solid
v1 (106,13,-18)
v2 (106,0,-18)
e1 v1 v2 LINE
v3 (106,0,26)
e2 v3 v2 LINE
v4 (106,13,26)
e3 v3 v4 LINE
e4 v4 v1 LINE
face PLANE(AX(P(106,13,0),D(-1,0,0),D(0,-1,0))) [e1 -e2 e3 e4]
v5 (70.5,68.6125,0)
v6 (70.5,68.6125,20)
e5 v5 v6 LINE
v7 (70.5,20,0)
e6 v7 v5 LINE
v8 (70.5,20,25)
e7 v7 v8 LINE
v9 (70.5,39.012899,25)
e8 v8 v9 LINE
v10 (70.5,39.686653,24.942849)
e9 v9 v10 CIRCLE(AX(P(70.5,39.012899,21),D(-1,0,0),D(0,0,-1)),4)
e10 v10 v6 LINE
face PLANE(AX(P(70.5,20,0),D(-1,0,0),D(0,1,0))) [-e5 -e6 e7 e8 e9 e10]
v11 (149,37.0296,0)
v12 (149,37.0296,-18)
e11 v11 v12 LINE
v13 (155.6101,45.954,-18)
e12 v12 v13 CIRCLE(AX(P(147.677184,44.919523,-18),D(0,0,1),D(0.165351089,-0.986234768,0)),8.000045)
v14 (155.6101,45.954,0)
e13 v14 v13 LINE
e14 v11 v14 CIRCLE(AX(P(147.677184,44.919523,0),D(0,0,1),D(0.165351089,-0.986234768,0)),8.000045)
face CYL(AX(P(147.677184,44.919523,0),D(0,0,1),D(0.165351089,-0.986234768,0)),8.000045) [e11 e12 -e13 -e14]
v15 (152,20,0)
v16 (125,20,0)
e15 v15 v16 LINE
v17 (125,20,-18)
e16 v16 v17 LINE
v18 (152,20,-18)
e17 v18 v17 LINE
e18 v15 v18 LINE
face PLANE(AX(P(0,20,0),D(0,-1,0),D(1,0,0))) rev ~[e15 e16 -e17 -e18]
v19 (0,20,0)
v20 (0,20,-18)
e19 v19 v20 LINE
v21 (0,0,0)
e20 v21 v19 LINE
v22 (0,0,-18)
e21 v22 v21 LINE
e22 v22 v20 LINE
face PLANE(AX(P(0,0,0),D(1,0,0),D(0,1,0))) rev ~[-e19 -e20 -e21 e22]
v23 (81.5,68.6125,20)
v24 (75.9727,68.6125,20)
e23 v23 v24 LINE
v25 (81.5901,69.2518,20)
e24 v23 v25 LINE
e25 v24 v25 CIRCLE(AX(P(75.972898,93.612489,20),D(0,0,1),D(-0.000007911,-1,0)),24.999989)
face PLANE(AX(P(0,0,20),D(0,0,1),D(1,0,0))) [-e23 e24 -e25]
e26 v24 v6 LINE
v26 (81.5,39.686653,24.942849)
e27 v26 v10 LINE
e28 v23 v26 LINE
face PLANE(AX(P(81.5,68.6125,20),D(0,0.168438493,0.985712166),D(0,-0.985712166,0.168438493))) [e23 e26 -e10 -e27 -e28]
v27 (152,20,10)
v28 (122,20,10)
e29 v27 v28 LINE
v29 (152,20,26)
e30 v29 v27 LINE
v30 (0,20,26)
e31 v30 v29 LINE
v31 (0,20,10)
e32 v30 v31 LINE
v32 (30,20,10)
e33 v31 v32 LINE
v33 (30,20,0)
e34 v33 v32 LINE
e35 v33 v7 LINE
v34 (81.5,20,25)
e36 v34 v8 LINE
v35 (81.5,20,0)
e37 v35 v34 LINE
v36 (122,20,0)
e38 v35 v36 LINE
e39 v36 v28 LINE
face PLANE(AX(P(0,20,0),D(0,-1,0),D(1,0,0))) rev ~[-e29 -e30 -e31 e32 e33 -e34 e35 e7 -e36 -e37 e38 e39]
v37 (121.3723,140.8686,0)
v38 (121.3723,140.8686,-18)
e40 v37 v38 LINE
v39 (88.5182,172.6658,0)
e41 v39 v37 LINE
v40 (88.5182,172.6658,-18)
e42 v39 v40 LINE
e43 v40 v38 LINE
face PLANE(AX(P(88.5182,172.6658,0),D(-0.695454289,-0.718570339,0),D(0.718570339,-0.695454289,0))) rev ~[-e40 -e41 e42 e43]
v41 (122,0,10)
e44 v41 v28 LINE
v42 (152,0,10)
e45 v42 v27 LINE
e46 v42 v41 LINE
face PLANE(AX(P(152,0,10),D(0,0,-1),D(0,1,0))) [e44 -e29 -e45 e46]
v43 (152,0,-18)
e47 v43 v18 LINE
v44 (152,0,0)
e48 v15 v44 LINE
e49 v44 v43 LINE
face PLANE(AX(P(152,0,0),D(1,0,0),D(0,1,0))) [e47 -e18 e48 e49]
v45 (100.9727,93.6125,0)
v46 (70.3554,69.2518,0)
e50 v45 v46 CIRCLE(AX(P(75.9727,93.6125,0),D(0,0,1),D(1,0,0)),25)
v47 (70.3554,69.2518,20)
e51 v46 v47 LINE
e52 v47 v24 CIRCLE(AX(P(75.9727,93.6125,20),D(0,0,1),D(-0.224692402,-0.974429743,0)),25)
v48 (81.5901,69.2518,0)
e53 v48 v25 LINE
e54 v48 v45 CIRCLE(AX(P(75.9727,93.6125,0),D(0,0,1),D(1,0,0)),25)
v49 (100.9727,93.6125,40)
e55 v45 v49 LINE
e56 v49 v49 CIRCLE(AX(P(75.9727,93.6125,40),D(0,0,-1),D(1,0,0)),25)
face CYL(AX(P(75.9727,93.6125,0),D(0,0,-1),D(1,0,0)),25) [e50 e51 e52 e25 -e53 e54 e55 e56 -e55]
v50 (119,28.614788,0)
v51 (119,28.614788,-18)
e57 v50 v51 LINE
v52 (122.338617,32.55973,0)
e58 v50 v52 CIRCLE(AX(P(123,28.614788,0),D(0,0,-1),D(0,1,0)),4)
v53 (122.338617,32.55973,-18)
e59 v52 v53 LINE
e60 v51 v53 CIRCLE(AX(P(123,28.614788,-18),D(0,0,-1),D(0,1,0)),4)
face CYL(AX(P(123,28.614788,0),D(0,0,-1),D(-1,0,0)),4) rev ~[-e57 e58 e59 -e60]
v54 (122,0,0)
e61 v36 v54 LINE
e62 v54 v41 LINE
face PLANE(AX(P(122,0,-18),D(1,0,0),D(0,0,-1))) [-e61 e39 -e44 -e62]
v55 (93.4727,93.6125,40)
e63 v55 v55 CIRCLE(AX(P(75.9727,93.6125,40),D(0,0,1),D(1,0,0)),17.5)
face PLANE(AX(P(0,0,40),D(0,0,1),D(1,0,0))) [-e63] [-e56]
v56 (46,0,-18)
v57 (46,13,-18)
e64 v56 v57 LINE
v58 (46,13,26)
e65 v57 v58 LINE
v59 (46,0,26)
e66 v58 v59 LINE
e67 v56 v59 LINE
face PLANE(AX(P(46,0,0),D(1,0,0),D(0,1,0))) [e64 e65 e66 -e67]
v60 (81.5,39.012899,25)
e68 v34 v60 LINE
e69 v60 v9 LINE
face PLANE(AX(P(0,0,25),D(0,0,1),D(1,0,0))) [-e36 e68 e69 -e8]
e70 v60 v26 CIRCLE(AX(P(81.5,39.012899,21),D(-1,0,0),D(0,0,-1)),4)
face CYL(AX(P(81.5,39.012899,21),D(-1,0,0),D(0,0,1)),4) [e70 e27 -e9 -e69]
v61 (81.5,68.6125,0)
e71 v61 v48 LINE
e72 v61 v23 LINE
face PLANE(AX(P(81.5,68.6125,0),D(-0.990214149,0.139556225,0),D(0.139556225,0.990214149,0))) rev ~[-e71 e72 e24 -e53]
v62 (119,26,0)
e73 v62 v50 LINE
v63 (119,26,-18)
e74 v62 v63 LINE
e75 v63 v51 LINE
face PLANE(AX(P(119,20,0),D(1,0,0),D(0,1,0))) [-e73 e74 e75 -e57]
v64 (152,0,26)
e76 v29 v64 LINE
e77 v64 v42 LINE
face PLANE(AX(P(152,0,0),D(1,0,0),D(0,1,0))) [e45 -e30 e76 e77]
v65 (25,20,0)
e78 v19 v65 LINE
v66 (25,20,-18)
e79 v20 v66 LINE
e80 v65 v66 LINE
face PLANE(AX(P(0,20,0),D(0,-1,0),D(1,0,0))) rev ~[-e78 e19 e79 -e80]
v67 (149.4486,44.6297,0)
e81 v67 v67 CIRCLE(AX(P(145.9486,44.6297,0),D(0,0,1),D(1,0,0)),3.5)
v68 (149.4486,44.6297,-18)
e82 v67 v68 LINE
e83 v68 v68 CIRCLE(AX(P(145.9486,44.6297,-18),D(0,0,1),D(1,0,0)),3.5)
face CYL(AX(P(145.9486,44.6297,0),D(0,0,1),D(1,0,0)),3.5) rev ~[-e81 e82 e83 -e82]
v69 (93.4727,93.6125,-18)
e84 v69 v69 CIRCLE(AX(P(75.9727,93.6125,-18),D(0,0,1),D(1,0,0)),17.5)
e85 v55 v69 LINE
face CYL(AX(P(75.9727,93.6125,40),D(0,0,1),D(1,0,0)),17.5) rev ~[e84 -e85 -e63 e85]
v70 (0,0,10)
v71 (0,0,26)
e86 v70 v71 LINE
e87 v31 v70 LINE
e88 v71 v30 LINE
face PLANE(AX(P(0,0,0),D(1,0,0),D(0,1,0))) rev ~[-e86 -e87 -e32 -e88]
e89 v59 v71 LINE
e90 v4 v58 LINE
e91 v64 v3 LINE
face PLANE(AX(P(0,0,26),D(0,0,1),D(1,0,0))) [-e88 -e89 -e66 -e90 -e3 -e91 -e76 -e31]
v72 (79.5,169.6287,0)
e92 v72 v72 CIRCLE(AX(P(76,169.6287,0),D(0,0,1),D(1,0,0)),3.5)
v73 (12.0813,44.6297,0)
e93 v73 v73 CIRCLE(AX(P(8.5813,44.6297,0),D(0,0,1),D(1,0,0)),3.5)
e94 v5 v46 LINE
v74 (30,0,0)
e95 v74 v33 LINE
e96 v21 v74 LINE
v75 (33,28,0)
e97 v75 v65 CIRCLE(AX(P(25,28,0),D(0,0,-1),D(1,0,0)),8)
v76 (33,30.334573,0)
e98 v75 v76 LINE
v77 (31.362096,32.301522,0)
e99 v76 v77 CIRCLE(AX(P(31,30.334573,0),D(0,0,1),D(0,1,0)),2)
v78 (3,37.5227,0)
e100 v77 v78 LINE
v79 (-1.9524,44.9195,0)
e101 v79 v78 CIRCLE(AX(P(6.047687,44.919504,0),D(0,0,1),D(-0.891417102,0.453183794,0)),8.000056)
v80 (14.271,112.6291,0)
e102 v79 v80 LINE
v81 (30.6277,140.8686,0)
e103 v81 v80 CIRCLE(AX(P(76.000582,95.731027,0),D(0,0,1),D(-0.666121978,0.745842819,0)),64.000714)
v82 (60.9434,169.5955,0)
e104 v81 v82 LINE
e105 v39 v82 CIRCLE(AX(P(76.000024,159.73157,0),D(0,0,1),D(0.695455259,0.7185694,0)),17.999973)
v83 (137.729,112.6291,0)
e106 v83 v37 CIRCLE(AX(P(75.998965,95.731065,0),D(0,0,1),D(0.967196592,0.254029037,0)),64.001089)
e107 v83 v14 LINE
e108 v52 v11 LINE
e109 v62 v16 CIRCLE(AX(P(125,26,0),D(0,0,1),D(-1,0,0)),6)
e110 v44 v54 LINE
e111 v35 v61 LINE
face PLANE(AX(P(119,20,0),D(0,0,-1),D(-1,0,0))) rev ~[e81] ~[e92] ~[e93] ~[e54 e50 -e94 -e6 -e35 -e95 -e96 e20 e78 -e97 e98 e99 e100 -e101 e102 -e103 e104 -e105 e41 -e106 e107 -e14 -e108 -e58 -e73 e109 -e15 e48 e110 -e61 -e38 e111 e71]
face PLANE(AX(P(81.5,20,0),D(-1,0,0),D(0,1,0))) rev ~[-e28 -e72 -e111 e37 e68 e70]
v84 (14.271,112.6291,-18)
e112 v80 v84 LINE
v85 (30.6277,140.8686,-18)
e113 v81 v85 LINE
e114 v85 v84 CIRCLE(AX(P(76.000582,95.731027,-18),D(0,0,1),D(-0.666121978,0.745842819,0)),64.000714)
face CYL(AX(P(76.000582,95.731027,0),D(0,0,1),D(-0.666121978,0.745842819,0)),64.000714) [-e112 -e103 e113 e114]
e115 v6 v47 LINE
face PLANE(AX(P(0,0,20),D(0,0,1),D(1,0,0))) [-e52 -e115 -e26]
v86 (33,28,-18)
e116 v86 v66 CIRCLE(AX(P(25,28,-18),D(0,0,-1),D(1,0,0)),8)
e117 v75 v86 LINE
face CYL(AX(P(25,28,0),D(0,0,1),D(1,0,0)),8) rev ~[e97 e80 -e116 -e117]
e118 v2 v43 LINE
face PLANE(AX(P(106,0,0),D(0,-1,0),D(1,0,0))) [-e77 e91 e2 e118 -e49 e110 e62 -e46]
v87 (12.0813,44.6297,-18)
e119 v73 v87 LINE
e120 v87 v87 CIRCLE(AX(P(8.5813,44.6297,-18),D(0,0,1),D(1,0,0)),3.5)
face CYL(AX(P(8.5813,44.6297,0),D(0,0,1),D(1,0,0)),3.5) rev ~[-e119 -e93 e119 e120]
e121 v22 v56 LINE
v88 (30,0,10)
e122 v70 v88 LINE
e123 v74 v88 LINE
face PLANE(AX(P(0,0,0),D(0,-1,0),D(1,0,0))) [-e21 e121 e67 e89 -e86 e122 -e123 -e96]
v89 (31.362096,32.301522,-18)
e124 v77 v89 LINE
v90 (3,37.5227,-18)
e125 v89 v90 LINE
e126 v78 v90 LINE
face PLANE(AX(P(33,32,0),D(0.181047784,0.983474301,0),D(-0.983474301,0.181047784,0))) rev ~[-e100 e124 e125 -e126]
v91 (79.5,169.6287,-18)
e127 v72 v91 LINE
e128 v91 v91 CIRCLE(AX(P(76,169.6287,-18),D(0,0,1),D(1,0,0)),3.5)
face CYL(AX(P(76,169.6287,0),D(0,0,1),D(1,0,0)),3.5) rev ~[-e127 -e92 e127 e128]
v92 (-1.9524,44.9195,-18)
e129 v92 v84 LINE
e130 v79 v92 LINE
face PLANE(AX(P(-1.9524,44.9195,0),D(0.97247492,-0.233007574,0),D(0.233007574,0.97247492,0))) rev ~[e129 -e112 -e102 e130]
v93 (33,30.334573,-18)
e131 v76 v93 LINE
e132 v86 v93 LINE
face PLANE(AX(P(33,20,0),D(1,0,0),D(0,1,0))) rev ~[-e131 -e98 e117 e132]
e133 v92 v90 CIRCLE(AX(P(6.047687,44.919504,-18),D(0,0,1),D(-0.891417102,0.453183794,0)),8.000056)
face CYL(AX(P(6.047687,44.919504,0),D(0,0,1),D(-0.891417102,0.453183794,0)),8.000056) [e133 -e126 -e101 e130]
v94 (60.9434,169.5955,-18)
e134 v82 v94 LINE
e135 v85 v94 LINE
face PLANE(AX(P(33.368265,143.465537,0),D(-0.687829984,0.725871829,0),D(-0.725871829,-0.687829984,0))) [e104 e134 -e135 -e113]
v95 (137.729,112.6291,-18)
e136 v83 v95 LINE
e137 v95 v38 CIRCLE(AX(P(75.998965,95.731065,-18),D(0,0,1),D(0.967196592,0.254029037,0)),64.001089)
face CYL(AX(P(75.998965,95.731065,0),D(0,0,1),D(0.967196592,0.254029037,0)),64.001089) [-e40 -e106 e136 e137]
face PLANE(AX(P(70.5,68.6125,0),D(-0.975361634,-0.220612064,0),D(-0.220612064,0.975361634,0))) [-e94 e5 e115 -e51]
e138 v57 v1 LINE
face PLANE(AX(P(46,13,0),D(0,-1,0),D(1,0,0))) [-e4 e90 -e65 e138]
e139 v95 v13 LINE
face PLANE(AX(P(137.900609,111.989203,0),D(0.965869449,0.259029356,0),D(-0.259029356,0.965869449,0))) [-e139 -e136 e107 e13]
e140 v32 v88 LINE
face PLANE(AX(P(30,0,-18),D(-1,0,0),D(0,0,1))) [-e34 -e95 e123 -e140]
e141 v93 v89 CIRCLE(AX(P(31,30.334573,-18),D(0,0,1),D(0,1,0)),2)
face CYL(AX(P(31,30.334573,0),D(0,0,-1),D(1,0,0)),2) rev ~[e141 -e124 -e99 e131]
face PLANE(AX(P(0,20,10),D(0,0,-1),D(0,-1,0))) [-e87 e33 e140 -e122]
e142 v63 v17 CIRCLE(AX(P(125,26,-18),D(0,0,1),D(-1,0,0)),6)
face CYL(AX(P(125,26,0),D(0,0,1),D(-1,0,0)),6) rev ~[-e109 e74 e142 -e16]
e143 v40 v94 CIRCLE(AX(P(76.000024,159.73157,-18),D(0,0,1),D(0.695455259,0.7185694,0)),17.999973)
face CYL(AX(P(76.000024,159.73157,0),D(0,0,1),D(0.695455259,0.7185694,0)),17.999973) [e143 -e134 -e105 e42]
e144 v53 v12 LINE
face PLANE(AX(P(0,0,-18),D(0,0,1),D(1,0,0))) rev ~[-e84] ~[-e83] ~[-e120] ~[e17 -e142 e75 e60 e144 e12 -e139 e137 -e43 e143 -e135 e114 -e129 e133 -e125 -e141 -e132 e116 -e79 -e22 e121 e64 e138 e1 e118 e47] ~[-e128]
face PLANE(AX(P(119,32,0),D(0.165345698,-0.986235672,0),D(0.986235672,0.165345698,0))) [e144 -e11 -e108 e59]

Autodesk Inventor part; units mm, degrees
ref_plane "YZ Plane" through (0, 0, 0) normal (1, 0, 0) x (0, 1, 0)
ref_plane "XZ Plane" through (0, 0, 0) normal (0, 1, 0) x (-1, 0, 0)
ref_plane "XY Plane" through (0, 0, 0) normal (0, 0, 1) x (1, 0, 0)
sketch "Sketch1" plane through (0, 0, 0) normal (0, 0, 1) x (1, 0, 0)
  line L0 (0, 0) -> (46, 0)
  line L1 (46, 0) -> (46, 13)
  line L2 (46, 13) -> (106, 13)
  line L3 (106, 13) -> (106, 0)
  line L4 (106, 0) -> (152, 0)
  line L5 (152, 0) -> (152, 20)
  line L6 (152, 20) -> (119, 20)
  line L7 (119, 20) -> (119, 32)
  line L8 (0, 0) -> (0, 20)
  line L9 (0, 20) -> (33, 20)
  line L10 (33, 20) -> (33, 32)
  arc A0 (88.5182, 172.6658) -> (60.9434, 169.5955) centre (76, 159.7315) ccw
  line L11 (88.5182, 172.6658) -> (121.3723, 140.8686)
  arc A1 (-1.0837, 48.545) -> (6.2613, 36.9223) centre (6.0476, 44.9195) ccw
  arc A2 (149, 37.0296) -> (155.0632, 47.9932) centre (147.6772, 44.9195) ccw
  line L12 (60.9434, 169.5955) -> (30.6277, 140.8686)
  line L13 (33, 32) -> (3, 37.5227)
  line L14 (119, 32) -> (149, 37.0296)
  line L15 (155.6101, 45.954) -> (137.729, 112.6291)
  line L16 (-1.9524, 44.9195) -> (14.271, 112.6291)
  arc A3 (137.9006, 111.9892) -> (119.6299, 142.555) centre (76, 95.7315) ccw
  arc A4 (33.3683, 143.4655) -> (13.316, 108.6436) centre (76, 95.7315) ccw
  point P0 (76, 13)
  dimension "d5" = 46
  dimension "d6" = 13
  dimension "d7" = 60
  dimension "d8" = 46
  dimension "d9" = 20
  dimension "d10" = 33
  dimension "d11" = 12
  dimension "d12" = 33
  dimension "d13" = 12
  dimension "d15" = 36
  dimension "d22" = 16
  dimension "d23" = 16
  dimension "d24" = 30
  dimension "d25" = 30
  dimension "d42" = 86
extrude "Extrusion1" add sketch "Sketch1" against normal blind 18 contours L8 L9 L10 L13 A1 L16 A4 L12 A0 L11 A3 L15 A2 L14 L7 L6 L5 L4 L3 L2 L1 L0
sketch "Sketch2" plane through (46, 0, 0) normal (1, 0, 0) x (0, 0, -1)
  point P0 (0, 0)
sketch "Sketch3" plane through (0, 0, 0) normal (0, 0, 1) x (1, 0, 0)
  line L0 (119, 20) -> (152, 20) projected
  line L1 (0, 20) -> (152, 20)
  line L2 (152, 20) -> (152, 0) projected
  line L3 (152, 20) -> (152, 0)
  line L4 (152, 0) -> (106, 0) projected
  line L5 (152, 0) -> (106, 0)
  line L6 (106, 0) -> (106, 13) projected
  line L7 (106, 0) -> (106, 13)
  line L8 (106, 13) -> (46, 13) projected
  line L9 (106, 13) -> (46, 13)
  line L10 (46, 13) -> (46, 0) projected
  line L11 (46, 13) -> (46, 0)
  line L12 (46, 0) -> (0, 0) projected
  line L13 (46, 0) -> (0, 0)
  line L14 (0, 0) -> (0, 20)
extrude "Extrusion2" add sketch "Sketch3" along normal blind 26
sketch "Sketch4" plane through (33, 20, 0) normal (0, 1, 0) x (1, 0, 0)
  point P0 (-33, 0)
sketch "Sketch5" plane through (152, 0, -18) normal (1, 0, 0) x (0, 0, -1)
  line L0 (0, 0) -> (-44, 0) projected
  line L1 (-28, 0) -> (-28, 20)
  line L2 (0, 20) -> (-44, 20) projected
  line L3 (-28, 20) -> (-18, 20)
  line L4 (-18, 20) -> (-18, 0)
  dimension "d32" = 16
  dimension "d33" = 10
extrude "Extrusion3" cut sketch "Sketch5" against normal blind 30
sketch "Sketch6" plane through (0, 0, 0) normal (0, 0, 1) x (1, 0, 0)
  line L0 (119, 20) -> (152, 20) projected
  point P0 (0, 0)
fillet "Fillet1" radius 4 1 edges at (119, 32, -9)
fillet "Fillet2" radius 6 1 edges at (119, 20, -9)
sketch "Sketch7" plane through (0, 0, -18) normal (-1, 0, 0) x (0, 0, 1)
  line L0 (0, 0) -> (44, 0) projected
  line L1 (18, 0) -> (18, 20)
  line L2 (18, 20) -> (0, 20) projected
  line L3 (18, 20) -> (28, 20)
  line L4 (0, 20) -> (44, 20) projected
  line L5 (28, 20) -> (28, 0)
  dimension "d38" = 18
  dimension "d39" = 10
extrude "Extrusion4" cut sketch "Sketch7" against normal blind 30
sketch "Sketch8" plane through (0, 0, 0) normal (0, 0, 1) x (1, 0, 0)
  point P0 (0, 0)
fillet "Fillet3" radius 8 1 edges at (33, 20, -9)
fillet "Fillet4" radius 2 1 edges at (33, 32, -9)
sketch "Sketch9" plane through (0, 0, 0) normal (0, 0, 1) x (1, 0, 0)
  line L0 (46, 13) -> (106, 13) projected
  arc A0 (88.5182, 172.6658) -> (60.9434, 169.5955) centre (76, 159.7315) ccw projected
  line L1 (76, 68) -> (76, 20)
  line L2 (30, 20) -> (122, 20) projected
  line L3 (76, 20) -> (81.5, 20)
  line L4 (81.5, 20) -> (81.5, 68.6125)
  line L5 (76, 20) -> (70.5, 20)
  line L6 (70.5, 20) -> (70.5, 68.6125)
  line L7 (70.5, 68.6125) -> (81.5, 68.6125)
  point P0 (0, 0)
  point P1 (76, 13)
  point P2 (76, 13)
  point P3 (76, 13)
  point P4 (74.0081, 177.621)
  dimension "d47" = 164.621
  dimension "d49" = 5.5
  dimension "d50" = 5.5
  dimension "d51" = 48
extrude "Extrusion5" add sketch "Sketch9" along normal blind 25
sketch "Sketch10" plane through (0, 0, 0) normal (0, 0, 1) x (1, 0, 0)
  circle A0 centre (76, 169.6287) radius 3.5
  circle A1 centre (145.9486, 44.6297) radius 3.5
  circle A2 centre (8.5813, 44.6297) radius 3.5
  line L0 (81.5, 68.6125) -> (70.5, 68.6125) projected
  line L1 (122.3386, 32.5597) -> (149, 37.0296) projected
  line L2 (3, 37.5227) -> (31.3621, 32.3015) projected
  point P0 (0, 0)
  point P1 (76, 68.6125)
  dimension "d55" = 7
  dimension "d56" = 7
  dimension "d57" = 7
  dimension "d78" = 8
  dimension "d79" = 8
extrude "Extrusion6" cut sketch "Sketch10" against normal blind 25
sketch "Sketch11" plane through (0, 0, 0) normal (0, 0, 1) x (1, 0, 0)
  circle A0 centre (75.9727, 93.6125) radius 25
  line L0 (81.5, 68.6125) -> (70.5, 68.6125) projected
  point P0 (0, 0)
  point P1 (76, 68.6125)
  dimension "d61" = 50
  dimension "d62" = 25
extrude "Extrusion7" add sketch "Sketch11" along normal blind 40
sketch "Sketch12" plane through (75.9727, 93.6125, 40) normal (0, 0, 1) x (1, 0, 0)
  circle A0 centre (0, 0) radius 17.5
  point P0 (-75.9727, -93.6125)
  dimension "d65" = 35
extrude "Extrusion8" cut sketch "Sketch12" against normal blind 117.25
sketch "Sketch13" plane through (81.5, 20, 0) normal (1, 0, 0) x (0, 0, -1)
  line L0 (0, 48.6125) -> (-40, 48.6125) projected
  line L1 (-20, 48.6125) -> (-25, 19.3522)
  line L2 (-25, 48.6125) -> (-25, 0) projected
  line L3 (0, 48.6125) -> (-25, 48.6125) projected
  line L4 (-20, 48.6125) -> (-25, 48.6125)
  line L5 (-25, 48.6125) -> (-25, 19.3522)
  point P0 (0, -20)
  dimension "d68" = 29.2603
extrude "Extrusion9" cut sketch "Sketch13" against normal blind 15
fillet "Fillet5" radius 4 1 edges at (76, 39.3522, 25)
sketch "Sketch14" plane through (0, 0, 0) normal (0, 0, 1) x (1, 0, 0)
  circle A0 centre (75.9727, 93.6125) radius 25 projected
  arc A1 (70.3554, 69.2518) -> (81.5123, 69.234) centre (75.9727, 93.6125) ccw
  line L0 (70.5, 68.6125) -> (70.3554, 69.2518)
  line L1 (70.4332, 69.234) -> (70.3554, 69.2518)
  line L2 (70.5, 68.6125) -> (75.9727, 68.6125) projected
  line L3 (70.5, 68.6125) -> (75.9727, 68.6125)
  line L4 (70.5, 68.6125) -> (75.9727, 68.6125)
  point P0 (0, 0)
  point P1 (70.4277, 68.9321)
  dimension "d72" = 25.2956
extrude "Extrusion10" add sketch "Sketch14" along normal blind 20 contours A0 L2 L0
sketch "Sketch15" plane through (0, 0, 0) normal (0, 0, 1) x (1, 0, 0)
  line L0 (81.5, 68.6125) -> (81.5, 39.6866) projected
  line L1 (81.5, 68.6125) -> (81.5901, 69.2518)
  arc A0 (75.9727, 68.6125) -> (70.3554, 69.2518) centre (75.9727, 93.6125) ccw projected
  line L2 (75.9727, 68.6125) -> (81.5, 68.6125) projected
  arc A1 (75.9727, 68.6125) -> (81.5901, 69.2518) centre (75.9727, 93.6125) ccw
  line L3 (81.5, 68.6125) -> (75.9727, 68.6125)
  point P0 (0, 0)
  point P1 (81.545, 68.9321)
  dimension "d75" = 0.3196
extrude "Extrusion11" add sketch "Sketch15" along normal blind 20
properties part number "COMPRESSOR 1" material "Aluminum 6061-AHC"
